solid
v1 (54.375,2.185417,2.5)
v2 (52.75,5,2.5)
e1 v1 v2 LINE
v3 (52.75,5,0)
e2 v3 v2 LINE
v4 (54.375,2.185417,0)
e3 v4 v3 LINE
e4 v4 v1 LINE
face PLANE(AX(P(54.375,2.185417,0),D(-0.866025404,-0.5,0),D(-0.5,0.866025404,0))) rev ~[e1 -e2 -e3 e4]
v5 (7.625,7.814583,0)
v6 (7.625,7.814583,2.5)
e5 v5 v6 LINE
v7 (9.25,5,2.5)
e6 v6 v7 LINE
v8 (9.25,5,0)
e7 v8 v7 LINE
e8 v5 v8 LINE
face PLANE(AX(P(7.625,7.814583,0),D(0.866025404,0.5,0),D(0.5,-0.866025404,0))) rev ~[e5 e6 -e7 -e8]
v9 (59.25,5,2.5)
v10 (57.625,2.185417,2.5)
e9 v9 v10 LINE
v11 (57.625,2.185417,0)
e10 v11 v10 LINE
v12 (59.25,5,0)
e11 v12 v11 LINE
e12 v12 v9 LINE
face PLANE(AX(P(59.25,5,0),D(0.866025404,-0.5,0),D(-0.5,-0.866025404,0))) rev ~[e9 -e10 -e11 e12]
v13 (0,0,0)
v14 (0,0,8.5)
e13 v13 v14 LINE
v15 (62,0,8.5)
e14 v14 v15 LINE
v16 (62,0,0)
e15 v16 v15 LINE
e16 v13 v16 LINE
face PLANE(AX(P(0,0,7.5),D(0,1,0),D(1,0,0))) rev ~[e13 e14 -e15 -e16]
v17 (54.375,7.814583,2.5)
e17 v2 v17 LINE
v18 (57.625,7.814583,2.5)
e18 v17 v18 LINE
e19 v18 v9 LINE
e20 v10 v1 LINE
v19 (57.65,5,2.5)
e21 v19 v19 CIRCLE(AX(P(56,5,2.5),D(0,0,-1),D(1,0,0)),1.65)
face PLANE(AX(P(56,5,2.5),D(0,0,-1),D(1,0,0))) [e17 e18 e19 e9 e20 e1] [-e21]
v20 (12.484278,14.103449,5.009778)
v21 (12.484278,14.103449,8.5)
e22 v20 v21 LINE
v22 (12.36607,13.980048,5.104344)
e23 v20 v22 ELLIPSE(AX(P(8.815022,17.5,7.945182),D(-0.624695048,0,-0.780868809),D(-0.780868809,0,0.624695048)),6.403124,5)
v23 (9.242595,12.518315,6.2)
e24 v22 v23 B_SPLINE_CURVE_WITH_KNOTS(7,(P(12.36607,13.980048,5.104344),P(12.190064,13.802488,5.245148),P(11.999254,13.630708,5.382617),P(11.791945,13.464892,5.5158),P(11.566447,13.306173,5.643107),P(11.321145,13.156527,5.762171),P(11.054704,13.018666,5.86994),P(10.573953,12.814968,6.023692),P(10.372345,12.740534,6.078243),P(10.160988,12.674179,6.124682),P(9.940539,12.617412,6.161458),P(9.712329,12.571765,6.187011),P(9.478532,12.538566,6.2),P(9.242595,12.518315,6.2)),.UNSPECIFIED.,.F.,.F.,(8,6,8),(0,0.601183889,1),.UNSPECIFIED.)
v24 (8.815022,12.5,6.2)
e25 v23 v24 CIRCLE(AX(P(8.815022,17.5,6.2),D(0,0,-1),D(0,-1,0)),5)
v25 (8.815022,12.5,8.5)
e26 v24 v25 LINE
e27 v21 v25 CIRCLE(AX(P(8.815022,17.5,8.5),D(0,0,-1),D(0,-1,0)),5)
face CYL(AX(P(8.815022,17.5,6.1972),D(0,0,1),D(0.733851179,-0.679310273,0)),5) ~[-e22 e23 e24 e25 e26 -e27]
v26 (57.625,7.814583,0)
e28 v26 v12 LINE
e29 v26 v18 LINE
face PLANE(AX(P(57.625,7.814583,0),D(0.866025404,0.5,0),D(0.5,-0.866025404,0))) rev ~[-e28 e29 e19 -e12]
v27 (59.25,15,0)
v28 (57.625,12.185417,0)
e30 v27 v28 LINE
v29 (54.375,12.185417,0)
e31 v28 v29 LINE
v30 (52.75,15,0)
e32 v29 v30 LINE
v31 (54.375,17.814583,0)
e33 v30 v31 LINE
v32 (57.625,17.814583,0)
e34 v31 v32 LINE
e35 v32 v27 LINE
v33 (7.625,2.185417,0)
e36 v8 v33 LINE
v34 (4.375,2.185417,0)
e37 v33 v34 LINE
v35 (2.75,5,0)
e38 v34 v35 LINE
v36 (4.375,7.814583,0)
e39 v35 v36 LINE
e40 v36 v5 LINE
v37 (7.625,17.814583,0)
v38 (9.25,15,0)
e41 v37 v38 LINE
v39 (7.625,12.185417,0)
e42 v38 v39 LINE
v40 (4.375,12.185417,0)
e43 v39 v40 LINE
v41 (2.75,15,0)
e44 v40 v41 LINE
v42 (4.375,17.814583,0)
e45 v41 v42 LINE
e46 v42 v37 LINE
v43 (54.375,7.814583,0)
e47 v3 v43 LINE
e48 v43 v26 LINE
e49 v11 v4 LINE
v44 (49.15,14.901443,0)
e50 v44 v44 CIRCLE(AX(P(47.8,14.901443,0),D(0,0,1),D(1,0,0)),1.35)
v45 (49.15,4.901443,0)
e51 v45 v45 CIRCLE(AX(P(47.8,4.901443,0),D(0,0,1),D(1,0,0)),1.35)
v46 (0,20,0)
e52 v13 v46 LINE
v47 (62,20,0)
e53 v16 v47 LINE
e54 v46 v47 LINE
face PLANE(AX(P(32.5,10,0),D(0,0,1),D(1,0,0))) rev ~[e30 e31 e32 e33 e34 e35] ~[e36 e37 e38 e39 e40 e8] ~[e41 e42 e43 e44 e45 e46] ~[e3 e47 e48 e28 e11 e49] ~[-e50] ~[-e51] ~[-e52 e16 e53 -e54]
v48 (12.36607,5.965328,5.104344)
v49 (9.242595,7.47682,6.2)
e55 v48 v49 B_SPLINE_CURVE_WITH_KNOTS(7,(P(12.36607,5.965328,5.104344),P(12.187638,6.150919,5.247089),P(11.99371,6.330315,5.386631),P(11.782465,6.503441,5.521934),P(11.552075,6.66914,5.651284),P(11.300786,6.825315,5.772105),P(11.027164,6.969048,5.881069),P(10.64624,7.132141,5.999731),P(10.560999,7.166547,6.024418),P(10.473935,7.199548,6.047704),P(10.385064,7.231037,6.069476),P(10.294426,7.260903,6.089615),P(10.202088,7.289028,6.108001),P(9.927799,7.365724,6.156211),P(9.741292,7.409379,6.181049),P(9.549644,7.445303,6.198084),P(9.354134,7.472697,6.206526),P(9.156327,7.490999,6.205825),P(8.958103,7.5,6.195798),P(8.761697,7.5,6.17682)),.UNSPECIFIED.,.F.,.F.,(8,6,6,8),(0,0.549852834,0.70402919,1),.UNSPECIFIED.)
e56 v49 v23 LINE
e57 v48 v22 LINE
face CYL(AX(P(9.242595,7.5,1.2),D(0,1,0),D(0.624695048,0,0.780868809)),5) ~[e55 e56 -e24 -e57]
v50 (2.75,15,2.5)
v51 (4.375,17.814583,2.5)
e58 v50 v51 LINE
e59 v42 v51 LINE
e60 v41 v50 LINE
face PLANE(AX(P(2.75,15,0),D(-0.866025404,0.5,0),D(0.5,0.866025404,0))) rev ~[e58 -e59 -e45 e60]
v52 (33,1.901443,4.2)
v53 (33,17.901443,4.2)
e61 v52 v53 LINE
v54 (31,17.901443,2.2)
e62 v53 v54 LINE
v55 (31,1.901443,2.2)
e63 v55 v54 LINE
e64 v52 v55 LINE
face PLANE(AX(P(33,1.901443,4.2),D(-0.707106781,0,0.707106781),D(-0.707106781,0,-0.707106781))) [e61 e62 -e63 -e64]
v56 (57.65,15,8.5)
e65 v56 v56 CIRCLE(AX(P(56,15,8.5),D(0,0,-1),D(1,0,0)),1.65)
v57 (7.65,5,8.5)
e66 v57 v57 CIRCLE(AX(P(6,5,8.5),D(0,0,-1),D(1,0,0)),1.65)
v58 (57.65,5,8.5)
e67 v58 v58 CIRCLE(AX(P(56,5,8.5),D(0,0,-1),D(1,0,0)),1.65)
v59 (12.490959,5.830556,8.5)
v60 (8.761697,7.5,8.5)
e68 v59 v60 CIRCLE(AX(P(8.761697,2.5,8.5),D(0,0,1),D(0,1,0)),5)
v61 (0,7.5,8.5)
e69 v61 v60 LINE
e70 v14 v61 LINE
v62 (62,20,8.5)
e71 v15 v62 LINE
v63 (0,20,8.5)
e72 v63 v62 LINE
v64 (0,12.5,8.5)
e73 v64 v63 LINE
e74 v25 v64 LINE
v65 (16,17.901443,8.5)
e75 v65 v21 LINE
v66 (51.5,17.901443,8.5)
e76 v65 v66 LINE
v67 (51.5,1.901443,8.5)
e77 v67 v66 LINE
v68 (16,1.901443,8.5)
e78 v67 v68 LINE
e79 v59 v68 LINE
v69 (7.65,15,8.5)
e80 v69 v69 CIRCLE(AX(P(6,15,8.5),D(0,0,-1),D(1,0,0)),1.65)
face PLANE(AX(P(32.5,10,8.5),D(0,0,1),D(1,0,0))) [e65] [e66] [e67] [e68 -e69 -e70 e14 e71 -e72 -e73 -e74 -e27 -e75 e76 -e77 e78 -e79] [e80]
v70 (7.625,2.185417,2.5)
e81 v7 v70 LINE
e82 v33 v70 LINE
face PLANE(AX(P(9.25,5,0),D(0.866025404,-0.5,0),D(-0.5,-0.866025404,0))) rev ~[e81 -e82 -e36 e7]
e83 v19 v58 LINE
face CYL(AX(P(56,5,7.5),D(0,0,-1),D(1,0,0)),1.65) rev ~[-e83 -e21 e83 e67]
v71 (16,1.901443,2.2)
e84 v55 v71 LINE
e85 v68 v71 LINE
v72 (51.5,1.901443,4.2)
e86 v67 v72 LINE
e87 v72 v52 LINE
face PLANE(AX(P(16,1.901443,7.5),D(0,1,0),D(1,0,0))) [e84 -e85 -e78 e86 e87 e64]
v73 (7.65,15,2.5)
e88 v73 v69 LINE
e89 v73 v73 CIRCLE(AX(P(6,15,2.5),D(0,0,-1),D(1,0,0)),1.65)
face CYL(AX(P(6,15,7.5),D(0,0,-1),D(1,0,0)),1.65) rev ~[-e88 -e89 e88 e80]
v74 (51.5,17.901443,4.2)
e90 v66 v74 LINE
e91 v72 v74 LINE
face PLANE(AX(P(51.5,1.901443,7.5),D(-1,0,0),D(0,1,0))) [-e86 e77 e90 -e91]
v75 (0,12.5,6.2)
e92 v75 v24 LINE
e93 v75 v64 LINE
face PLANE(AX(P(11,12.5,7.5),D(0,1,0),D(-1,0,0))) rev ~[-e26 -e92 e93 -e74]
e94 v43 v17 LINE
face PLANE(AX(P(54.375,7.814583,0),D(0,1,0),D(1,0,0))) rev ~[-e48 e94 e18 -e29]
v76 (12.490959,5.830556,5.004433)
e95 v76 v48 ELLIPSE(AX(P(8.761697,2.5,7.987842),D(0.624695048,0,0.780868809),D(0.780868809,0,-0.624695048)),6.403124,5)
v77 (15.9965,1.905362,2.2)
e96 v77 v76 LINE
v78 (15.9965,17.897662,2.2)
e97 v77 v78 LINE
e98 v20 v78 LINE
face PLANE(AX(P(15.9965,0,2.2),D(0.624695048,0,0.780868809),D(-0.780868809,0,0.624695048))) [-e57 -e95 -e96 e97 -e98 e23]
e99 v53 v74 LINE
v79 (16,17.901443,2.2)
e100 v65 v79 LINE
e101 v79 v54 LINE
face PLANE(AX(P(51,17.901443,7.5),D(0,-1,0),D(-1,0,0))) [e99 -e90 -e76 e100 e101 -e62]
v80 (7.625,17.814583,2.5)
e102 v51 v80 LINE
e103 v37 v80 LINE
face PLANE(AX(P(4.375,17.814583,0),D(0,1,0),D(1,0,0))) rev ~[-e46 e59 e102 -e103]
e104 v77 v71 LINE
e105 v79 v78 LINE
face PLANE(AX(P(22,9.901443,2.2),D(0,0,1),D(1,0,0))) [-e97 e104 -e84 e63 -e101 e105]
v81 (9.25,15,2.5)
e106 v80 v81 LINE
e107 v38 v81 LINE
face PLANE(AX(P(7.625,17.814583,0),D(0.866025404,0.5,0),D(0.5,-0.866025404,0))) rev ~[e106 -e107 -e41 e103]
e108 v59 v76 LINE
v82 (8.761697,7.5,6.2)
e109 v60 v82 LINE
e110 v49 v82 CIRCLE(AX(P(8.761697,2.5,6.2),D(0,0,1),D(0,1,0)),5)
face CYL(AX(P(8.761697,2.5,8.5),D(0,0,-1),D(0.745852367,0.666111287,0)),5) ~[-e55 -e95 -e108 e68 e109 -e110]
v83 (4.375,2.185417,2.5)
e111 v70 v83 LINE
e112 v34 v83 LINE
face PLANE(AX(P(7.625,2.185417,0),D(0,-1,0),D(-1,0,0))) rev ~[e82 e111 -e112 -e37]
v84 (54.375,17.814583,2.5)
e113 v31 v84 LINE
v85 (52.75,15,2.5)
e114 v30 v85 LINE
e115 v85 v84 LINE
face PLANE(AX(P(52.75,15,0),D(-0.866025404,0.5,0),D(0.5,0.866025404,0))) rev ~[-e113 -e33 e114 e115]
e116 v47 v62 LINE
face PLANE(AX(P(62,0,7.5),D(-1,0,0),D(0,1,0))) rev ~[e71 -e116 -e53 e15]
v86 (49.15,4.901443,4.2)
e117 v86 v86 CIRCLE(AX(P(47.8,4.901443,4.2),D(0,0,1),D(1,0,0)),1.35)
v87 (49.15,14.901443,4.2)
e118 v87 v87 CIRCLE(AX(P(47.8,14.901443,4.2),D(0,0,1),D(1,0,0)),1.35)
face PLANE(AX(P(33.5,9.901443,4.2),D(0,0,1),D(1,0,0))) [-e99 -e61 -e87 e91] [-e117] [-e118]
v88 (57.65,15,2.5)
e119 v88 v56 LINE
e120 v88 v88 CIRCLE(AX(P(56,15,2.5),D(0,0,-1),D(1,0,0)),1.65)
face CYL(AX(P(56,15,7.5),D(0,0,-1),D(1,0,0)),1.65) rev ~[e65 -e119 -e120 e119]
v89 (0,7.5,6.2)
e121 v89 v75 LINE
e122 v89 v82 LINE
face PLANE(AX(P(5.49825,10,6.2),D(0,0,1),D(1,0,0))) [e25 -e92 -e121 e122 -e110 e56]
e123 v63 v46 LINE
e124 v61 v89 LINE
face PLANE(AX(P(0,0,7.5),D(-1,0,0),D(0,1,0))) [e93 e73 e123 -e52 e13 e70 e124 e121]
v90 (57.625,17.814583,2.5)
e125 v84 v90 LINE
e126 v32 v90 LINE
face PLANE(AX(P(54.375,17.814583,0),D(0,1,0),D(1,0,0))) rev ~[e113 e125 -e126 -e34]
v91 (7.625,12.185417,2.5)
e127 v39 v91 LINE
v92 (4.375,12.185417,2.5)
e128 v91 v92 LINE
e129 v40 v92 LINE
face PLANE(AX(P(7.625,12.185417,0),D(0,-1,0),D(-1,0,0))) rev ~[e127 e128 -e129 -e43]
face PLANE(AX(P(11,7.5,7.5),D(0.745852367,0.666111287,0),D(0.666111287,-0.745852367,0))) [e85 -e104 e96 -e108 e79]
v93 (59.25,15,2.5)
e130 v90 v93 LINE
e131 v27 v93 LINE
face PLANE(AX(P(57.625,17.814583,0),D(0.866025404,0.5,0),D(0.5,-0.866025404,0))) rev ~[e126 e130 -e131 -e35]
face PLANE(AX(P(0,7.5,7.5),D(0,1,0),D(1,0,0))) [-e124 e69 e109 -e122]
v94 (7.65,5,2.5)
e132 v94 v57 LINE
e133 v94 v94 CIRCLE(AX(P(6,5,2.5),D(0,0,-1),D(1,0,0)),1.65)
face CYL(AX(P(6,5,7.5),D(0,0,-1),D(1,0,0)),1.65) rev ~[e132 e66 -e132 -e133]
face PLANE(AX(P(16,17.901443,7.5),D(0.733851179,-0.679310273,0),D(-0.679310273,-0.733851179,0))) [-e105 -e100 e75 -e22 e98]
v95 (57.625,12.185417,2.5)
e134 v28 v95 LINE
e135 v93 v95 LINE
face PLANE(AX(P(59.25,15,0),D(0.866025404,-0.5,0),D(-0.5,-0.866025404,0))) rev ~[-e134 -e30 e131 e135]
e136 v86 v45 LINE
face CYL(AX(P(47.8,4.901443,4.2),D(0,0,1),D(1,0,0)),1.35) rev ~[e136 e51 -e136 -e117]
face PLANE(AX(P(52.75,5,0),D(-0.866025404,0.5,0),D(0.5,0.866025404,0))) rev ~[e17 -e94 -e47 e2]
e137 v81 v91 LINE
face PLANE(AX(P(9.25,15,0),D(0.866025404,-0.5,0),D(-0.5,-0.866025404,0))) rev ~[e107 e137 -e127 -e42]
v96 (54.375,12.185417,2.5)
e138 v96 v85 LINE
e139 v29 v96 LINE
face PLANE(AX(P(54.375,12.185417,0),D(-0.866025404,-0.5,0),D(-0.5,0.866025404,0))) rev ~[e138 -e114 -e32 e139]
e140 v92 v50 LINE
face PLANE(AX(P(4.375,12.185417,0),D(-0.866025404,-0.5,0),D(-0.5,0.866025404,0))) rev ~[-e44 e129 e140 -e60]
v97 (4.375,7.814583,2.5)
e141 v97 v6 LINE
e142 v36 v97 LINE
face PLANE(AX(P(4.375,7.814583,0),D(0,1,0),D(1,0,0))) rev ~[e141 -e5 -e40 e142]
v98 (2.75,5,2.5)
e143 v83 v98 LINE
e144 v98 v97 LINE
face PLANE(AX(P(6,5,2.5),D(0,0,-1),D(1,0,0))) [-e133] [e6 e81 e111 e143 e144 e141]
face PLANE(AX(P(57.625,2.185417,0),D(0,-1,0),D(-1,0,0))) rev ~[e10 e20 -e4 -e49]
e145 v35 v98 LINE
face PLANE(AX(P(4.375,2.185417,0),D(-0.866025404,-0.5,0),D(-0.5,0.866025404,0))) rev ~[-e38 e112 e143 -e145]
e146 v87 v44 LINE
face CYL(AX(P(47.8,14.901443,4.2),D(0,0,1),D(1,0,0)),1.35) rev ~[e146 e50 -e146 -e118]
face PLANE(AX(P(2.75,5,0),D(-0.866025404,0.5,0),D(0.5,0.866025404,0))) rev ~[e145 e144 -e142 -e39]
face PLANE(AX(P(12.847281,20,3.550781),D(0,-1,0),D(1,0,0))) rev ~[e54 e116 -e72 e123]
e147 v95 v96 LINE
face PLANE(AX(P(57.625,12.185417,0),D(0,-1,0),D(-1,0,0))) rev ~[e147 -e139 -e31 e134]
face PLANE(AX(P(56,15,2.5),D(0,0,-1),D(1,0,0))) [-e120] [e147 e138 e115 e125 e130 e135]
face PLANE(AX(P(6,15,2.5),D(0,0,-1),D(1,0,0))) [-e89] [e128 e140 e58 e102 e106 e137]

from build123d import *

# Parameters (mm, degrees)
F0_W         = 65
F0_H         = 20
F1_DEPTH     = 7.5
F3_DEPTH     = 2.5
F4_R         = 1.65
F5_DEPTH     = 5
F7_DEPTH     = 3.3
F8_W         = 12
F8_H         = 16
F9_DEPTH     = 2
F10_R        = 1.35
F11_DEPTH    = 5
F12_T4_DEPTH = 16
F15_DEPTH    = 2
F16_DEPTH    = 20
F17_W        = 20
F17_H        = 7.5
F18_DEPTH    = 3
F19_W        = 10.9964999743
F19_H        = 5
F20_DEPTH    = 2
F21_DEPTH    = 1
F22_R        = 5
F23_DEPTH    = 0.5


# Not quite as in the source:
# - a fillet or chamfer that OpenCascade refuses, or shapes differently, is made with other operations: its cross-section is extruded or revolved along the edge and cut away or added


with BuildPart() as f1:
    # F0 (on Top) → F1 (new body)
    with BuildSketch(Plane.XY):
        with Locations((32.5, 10)):
            Rectangle(F0_W, F0_H)
    extrude(amount=F1_DEPTH)

    # F2 (on face) → F3 (cut)
    with BuildSketch(Plane(origin=(0, 0, 0), x_dir=(1, 0, 0), z_dir=(0, 0, -1))):
        Polygon((4.375, -7.8145825623), (7.625, -7.8145825623), (9.25, -5), (7.625, -2.1854174377), (4.375, -2.1854174377), (2.75, -5), align=None)
        Polygon((7.625, -12.1854174377), (4.375, -12.1854174377), (2.75, -15), (4.375, -17.8145825623), (7.625, -17.8145825623), (9.25, -15), align=None)
        Polygon((54.375, -7.8145825623), (57.625, -7.8145825623), (59.25, -5), (57.625, -2.1854174377), (54.375, -2.1854174377), (52.75, -5), align=None)
        Polygon((54.375, -17.8145825623), (57.625, -17.8145825623), (59.25, -15), (57.625, -12.1854174377), (54.375, -12.1854174377), (52.75, -15), align=None)
    extrude(amount=-F3_DEPTH, mode=Mode.SUBTRACT)

    # F4 (on face) → F5 (cut)
    with BuildSketch(Plane(origin=(0, 0, 2.5), x_dir=(1, 0, 0), z_dir=(0, 0, -1))):
        with Locations((6, -5)):
            Circle(F4_R)
        with Locations((6, -15)):
            Circle(F4_R)
        with Locations((56, -5)):
            Circle(F4_R)
        with Locations((56, -15)):
            Circle(F4_R)
    extrude(amount=-F5_DEPTH, mode=Mode.SUBTRACT)

    # F6 (on face) → F7 (cut)
    with BuildSketch(Plane.XY.offset(7.5)):
        Polygon((51, 17.9014432635), (16, 17.9014432635), (16, 12.5), (16, 7.5), (16, 1.9014432635), (51, 1.9014432635), align=None)
        Polygon((16, 12.5), (16, 17.9014432635), (11, 12.5), align=None)
        Polygon((16, 7.5), (16, 12.5), (11, 12.5), (0, 12.5), (0, 7.5), (11, 7.5), align=None)
        Polygon((16, 1.9014432635), (16, 7.5), (11, 7.5), align=None)
    extrude(amount=-F7_DEPTH, mode=Mode.SUBTRACT)

    # F8 (on face) → F9 (cut)
    with BuildSketch(Plane.XY.offset(4.2)):
        with Locations((22, 9.9014432635)):
            Rectangle(F8_W, F8_H)
    extrude(amount=-F9_DEPTH, mode=Mode.SUBTRACT)

    # F10 (on face) → F11 (cut)
    with BuildSketch(Plane.XY.offset(4.2)):
        with Locations((47.8, 14.9014432635)):
            Circle(F10_R)
        with Locations((47.8, 4.9014432635)):
            Circle(F10_R)
    extrude(amount=-F11_DEPTH, mode=Mode.SUBTRACT)

    # F12: chamfer of 5 on 1 edges, made by hand


with BuildPart() as f12_tool2:
    # F12_s3 → F12_t4 (new body)
    with BuildSketch(Plane.XZ.offset(-1.9014432635)):
        Polygon((33, 4.2), (28, -0.8), (28, 4.2), align=None)
    extrude(amount=-F12_T4_DEPTH)

    split(bisect_by=Plane.XY.offset(2.2), keep=Keep.TOP)


with BuildPart() as f1_1:
    add(f1.part)

    # F12_t1: cut F12_tool2
    add(f12_tool2.part, mode=Mode.SUBTRACT)

    # F14 (on face) → F15 (cut)
    with BuildSketch(Plane.XY.offset(4.2)):
        Polygon((16, 17.9014432635), (11, 12.5), (11, 7.5), (16, 1.9014432635), align=None)
    extrude(amount=-F15_DEPTH, mode=Mode.SUBTRACT)

    # F13 (on face) → F16 (join)
    with BuildSketch(Plane.XZ):
        Polygon((10.9964999743, 2.2), (15.9964999743, 2.2), (10.9964999743, 6.2), align=None)
    extrude(amount=-F16_DEPTH)

    # F17 (on face) → F18 (cut)
    with BuildSketch(Plane.YZ.offset(65)):
        with Locations((10, 3.75)):
            Rectangle(F17_W, F17_H)
    extrude(amount=-F18_DEPTH, mode=Mode.SUBTRACT)

    # F19 (on face) → F20 (join)
    with BuildSketch(Plane.XY.offset(4.2)):
        with Locations((5.4982499871, 10)):
            Rectangle(F19_W, F19_H)
    extrude(amount=F20_DEPTH)

    # F21 (add): a face of the model
    f21_faces = [f1_1.faces().sort_by_distance(p)[0] for p in [
        (61.348540101, 10, 7.5),
    ]]
    extrude(f21_faces, amount=F21_DEPTH)

    # F22 (call 1 of 3: OpenCascade refuses the feature's edges together)
    f22_edges = [f1_1.edges().sort_by_distance(p)[0] for p in [
        (11, 12.5, 7.3486),
    ]]
    fillet(f22_edges, radius=F22_R)

    # F22#2 (call 2 of 3)
    f22_2_edges = [f1_1.edges().sort_by_distance(p)[0] for p in [
        (10.9965, 10, 6.2),
    ]]
    fillet(f22_2_edges, radius=F22_R)

    # F22#3 (call 3 of 3)
    f22_3_edges = [f1_1.edges().sort_by_distance(p)[0] for p in [
        (11, 7.5, 7.3486),
    ]]
    fillet(f22_3_edges, radius=F22_R)

    # F23 (cut): a face of the model
    f23_faces = [f1_1.faces().sort_by_distance(p)[0] for p in [
        (51, 9.9014432635, 6.35),
    ]]
    extrude(f23_faces, amount=-F23_DEPTH, mode=Mode.SUBTRACT)


solid = f1_1.part
